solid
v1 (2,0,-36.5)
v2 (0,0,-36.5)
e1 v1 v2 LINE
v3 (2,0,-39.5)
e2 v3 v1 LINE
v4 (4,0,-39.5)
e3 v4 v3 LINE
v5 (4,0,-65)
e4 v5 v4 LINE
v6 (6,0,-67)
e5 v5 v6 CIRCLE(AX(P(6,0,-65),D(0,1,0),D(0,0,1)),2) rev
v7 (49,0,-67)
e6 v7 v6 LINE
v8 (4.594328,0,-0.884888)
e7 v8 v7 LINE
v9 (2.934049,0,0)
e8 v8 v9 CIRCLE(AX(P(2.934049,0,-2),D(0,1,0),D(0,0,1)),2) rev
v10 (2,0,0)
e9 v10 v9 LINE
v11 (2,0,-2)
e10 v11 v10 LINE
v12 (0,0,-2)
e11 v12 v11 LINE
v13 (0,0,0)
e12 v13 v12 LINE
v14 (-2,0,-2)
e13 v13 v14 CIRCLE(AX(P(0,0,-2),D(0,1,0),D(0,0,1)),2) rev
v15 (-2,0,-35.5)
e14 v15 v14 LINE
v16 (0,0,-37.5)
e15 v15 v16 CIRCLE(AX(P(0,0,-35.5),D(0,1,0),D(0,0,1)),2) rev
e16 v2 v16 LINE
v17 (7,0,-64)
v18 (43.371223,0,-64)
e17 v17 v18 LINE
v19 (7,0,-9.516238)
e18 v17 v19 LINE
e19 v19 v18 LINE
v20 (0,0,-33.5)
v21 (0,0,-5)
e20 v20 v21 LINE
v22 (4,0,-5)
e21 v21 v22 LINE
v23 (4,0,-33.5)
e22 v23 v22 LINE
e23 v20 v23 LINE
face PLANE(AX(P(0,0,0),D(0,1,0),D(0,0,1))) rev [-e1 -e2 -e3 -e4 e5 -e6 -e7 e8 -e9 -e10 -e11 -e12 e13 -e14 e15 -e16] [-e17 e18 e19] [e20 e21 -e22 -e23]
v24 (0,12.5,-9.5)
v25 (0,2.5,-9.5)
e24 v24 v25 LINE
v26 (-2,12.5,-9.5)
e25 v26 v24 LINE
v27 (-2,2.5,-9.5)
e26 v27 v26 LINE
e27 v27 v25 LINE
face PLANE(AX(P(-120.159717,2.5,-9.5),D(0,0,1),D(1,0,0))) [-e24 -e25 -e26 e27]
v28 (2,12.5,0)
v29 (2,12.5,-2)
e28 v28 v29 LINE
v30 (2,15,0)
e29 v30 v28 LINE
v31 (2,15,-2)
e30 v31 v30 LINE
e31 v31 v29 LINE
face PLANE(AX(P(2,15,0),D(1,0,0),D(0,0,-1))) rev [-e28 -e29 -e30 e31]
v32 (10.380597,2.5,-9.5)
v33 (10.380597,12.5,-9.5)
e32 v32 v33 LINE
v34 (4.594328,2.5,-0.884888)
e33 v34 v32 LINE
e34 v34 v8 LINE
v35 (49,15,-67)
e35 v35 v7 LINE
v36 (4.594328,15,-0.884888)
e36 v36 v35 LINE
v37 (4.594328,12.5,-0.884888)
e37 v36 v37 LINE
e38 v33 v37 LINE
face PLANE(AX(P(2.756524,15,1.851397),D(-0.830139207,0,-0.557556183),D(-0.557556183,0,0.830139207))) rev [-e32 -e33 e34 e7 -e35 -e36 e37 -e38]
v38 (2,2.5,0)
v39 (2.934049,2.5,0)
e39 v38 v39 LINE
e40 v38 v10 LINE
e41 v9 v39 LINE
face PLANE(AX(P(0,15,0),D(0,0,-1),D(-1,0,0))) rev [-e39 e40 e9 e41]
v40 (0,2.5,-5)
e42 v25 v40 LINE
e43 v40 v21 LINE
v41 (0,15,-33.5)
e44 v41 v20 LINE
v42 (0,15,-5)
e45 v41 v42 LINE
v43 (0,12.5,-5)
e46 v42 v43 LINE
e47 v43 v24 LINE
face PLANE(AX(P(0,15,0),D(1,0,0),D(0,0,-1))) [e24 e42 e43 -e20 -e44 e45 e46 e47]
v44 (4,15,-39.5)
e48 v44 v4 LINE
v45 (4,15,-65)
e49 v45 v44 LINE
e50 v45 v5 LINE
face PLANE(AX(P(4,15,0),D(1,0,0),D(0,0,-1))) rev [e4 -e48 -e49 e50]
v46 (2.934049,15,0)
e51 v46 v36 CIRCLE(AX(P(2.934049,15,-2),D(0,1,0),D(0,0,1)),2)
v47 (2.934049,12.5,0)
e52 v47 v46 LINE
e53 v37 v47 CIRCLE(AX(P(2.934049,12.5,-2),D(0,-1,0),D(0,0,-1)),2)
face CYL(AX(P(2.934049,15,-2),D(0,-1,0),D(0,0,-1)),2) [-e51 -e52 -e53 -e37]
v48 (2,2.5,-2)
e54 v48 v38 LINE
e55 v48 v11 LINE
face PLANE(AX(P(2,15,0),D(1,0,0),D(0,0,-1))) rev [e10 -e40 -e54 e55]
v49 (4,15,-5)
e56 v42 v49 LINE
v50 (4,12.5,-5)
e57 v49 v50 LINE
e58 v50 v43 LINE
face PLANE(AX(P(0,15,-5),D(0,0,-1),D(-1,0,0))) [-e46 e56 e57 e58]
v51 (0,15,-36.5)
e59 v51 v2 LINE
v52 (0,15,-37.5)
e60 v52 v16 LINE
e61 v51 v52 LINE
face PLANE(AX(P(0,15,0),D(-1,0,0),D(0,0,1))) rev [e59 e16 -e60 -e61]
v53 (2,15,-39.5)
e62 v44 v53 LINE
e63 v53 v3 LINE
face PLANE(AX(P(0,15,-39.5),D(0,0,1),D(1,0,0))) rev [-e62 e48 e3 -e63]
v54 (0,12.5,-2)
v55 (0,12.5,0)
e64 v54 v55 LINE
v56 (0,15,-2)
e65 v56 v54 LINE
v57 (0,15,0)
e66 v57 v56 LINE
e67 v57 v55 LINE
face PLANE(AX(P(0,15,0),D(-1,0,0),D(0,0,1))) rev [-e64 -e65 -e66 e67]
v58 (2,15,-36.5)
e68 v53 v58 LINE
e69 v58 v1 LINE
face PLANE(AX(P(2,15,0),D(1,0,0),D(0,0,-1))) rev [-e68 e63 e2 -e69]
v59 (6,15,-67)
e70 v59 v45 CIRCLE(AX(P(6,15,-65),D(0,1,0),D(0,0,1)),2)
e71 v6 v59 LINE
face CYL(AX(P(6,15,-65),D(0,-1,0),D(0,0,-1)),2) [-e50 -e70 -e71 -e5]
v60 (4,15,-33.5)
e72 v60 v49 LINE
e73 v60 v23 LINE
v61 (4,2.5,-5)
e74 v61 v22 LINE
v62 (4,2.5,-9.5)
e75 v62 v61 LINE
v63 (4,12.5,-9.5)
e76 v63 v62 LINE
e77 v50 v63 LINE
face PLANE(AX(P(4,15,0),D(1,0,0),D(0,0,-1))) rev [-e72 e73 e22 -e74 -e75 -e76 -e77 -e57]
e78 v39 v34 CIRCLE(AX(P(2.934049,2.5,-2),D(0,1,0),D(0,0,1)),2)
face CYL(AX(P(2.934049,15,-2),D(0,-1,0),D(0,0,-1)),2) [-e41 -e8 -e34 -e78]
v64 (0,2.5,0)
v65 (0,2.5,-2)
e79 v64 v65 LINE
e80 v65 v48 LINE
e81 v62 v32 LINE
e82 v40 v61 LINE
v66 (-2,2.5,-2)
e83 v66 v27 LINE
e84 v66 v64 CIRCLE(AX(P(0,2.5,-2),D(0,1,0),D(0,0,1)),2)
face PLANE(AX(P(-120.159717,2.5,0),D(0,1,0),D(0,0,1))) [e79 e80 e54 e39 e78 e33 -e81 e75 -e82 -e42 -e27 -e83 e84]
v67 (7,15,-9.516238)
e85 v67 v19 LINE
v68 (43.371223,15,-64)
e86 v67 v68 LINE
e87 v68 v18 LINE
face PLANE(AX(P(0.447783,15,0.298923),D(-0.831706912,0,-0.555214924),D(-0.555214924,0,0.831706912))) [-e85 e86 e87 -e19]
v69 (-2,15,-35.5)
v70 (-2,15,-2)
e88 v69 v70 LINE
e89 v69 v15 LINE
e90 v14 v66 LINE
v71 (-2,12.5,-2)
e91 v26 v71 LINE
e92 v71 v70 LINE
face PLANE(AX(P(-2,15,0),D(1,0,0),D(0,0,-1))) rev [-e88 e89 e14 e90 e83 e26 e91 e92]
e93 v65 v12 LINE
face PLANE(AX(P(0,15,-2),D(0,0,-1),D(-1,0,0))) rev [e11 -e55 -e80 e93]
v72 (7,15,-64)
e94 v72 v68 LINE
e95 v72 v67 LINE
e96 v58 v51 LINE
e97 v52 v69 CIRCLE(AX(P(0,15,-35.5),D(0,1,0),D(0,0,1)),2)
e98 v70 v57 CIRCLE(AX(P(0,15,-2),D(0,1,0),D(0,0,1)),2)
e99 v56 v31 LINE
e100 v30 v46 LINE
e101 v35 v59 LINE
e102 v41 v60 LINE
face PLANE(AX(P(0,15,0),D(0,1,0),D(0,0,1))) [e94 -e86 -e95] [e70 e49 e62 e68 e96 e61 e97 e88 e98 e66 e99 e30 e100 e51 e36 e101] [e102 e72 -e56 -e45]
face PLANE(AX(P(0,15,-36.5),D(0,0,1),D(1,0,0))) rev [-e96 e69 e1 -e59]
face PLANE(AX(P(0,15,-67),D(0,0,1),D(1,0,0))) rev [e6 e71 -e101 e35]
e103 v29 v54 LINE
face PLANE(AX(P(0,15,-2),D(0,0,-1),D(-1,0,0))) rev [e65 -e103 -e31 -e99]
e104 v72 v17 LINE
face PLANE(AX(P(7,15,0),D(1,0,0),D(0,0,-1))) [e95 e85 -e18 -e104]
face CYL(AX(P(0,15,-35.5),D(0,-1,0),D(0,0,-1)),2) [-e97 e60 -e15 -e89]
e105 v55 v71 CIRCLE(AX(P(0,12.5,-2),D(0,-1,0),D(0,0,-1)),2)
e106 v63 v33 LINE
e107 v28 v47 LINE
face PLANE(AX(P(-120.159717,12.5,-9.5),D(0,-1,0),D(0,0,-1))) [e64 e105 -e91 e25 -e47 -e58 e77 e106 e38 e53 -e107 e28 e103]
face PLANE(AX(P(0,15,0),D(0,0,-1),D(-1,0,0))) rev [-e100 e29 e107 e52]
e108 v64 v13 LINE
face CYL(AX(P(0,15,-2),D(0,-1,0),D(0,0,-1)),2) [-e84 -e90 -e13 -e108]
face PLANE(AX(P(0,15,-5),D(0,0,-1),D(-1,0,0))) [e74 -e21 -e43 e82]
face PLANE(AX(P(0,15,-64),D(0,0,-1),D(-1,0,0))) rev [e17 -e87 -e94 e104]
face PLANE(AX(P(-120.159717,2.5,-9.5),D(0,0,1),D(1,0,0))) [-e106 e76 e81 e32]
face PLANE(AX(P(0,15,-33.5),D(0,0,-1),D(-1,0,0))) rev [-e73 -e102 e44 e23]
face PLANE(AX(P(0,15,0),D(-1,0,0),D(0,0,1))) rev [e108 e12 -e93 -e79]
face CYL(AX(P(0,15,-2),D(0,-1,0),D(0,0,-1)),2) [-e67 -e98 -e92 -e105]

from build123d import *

# Parameters (mm, degrees)
SKETCH2_W               = 4
SKETCH2_H               = 28.5
BOSS_EXTRUDE1_DEPTH     = 15
CUT_EXTRUDE1_DEPTH      = 86.527773267
CUT_EXTRUDE1_DEPTH_BACK = 15
SKETCH3_W               = 9.5
SKETCH3_H               = 10
FILLET1_R               = 2
FILLET2_R               = 2
FILLET3_R               = 2
FILLET4_R               = 2
FILLET5_R               = 2
FILLET6_R               = 2


with BuildPart() as part:
    # Sketch2 → Boss-Extrude1 (new body)
    with BuildSketch(Plane(origin=(0, 0, 0), x_dir=(1, 0, 0), z_dir=(0, 1, 0))):
        Polygon((0, 0), (0, 2), (2, 2), (2, 0), (4, 0), (49, 67), (4, 67), (4, 39.5), (2, 39.5), (2, 36.5), (0, 36.5), (0, 37.5), (-2, 37.5), (-2, 0), align=None)
        with Locations((2, 19.25)):
            Rectangle(SKETCH2_W, SKETCH2_H, mode=Mode.SUBTRACT)
        Polygon((7, 64), (43.371222906, 64), (7, 9.516238481), align=None, mode=Mode.SUBTRACT)
    extrude(amount=BOSS_EXTRUDE1_DEPTH)

    # Sketch3 → Cut-Extrude1 (cut, two sides: drawn at the far end of the back side and taken through both)
    with BuildSketch(Plane.ZY.offset(2).offset(-CUT_EXTRUDE1_DEPTH_BACK)):
        with Locations((-4.75, 7.5)):
            Rectangle(SKETCH3_W, SKETCH3_H)
    extrude(amount=CUT_EXTRUDE1_DEPTH + CUT_EXTRUDE1_DEPTH_BACK, mode=Mode.SUBTRACT)

    # Fillet1
    fillet1_edges = [part.edges().sort_by_distance(p)[0] for p in [
        (-2, 7.5, -37.5),
    ]]
    fillet(fillet1_edges, radius=FILLET1_R - 0.0001)  # a hair under: the kernel refuses the full size

    # Fillet2
    fillet2_edges = [part.edges().sort_by_distance(p)[0] for p in [
        (4, 7.5, -67),
    ]]
    fillet(fillet2_edges, radius=FILLET2_R)

    # Fillet3
    fillet3_edges = [part.edges().sort_by_distance(p)[0] for p in [
        (4, 1.25, 0),
    ]]
    fillet(fillet3_edges, radius=FILLET3_R)

    # Fillet4
    fillet4_edges = [part.edges().sort_by_distance(p)[0] for p in [
        (4, 13.75, 0),
    ]]
    fillet(fillet4_edges, radius=FILLET4_R)

    # Fillet5
    fillet5_edges = [part.edges().sort_by_distance(p)[0] for p in [
        (-2, 13.75, 0),
    ]]
    fillet(fillet5_edges, radius=FILLET5_R - 0.0001)  # a hair under: the kernel refuses the full size

    # Fillet6
    fillet6_edges = [part.edges().sort_by_distance(p)[0] for p in [
        (-2, 1.25, 0),
    ]]
    fillet(fillet6_edges, radius=FILLET6_R - 0.0001)  # a hair under: the kernel refuses the full size


solid = part.part
